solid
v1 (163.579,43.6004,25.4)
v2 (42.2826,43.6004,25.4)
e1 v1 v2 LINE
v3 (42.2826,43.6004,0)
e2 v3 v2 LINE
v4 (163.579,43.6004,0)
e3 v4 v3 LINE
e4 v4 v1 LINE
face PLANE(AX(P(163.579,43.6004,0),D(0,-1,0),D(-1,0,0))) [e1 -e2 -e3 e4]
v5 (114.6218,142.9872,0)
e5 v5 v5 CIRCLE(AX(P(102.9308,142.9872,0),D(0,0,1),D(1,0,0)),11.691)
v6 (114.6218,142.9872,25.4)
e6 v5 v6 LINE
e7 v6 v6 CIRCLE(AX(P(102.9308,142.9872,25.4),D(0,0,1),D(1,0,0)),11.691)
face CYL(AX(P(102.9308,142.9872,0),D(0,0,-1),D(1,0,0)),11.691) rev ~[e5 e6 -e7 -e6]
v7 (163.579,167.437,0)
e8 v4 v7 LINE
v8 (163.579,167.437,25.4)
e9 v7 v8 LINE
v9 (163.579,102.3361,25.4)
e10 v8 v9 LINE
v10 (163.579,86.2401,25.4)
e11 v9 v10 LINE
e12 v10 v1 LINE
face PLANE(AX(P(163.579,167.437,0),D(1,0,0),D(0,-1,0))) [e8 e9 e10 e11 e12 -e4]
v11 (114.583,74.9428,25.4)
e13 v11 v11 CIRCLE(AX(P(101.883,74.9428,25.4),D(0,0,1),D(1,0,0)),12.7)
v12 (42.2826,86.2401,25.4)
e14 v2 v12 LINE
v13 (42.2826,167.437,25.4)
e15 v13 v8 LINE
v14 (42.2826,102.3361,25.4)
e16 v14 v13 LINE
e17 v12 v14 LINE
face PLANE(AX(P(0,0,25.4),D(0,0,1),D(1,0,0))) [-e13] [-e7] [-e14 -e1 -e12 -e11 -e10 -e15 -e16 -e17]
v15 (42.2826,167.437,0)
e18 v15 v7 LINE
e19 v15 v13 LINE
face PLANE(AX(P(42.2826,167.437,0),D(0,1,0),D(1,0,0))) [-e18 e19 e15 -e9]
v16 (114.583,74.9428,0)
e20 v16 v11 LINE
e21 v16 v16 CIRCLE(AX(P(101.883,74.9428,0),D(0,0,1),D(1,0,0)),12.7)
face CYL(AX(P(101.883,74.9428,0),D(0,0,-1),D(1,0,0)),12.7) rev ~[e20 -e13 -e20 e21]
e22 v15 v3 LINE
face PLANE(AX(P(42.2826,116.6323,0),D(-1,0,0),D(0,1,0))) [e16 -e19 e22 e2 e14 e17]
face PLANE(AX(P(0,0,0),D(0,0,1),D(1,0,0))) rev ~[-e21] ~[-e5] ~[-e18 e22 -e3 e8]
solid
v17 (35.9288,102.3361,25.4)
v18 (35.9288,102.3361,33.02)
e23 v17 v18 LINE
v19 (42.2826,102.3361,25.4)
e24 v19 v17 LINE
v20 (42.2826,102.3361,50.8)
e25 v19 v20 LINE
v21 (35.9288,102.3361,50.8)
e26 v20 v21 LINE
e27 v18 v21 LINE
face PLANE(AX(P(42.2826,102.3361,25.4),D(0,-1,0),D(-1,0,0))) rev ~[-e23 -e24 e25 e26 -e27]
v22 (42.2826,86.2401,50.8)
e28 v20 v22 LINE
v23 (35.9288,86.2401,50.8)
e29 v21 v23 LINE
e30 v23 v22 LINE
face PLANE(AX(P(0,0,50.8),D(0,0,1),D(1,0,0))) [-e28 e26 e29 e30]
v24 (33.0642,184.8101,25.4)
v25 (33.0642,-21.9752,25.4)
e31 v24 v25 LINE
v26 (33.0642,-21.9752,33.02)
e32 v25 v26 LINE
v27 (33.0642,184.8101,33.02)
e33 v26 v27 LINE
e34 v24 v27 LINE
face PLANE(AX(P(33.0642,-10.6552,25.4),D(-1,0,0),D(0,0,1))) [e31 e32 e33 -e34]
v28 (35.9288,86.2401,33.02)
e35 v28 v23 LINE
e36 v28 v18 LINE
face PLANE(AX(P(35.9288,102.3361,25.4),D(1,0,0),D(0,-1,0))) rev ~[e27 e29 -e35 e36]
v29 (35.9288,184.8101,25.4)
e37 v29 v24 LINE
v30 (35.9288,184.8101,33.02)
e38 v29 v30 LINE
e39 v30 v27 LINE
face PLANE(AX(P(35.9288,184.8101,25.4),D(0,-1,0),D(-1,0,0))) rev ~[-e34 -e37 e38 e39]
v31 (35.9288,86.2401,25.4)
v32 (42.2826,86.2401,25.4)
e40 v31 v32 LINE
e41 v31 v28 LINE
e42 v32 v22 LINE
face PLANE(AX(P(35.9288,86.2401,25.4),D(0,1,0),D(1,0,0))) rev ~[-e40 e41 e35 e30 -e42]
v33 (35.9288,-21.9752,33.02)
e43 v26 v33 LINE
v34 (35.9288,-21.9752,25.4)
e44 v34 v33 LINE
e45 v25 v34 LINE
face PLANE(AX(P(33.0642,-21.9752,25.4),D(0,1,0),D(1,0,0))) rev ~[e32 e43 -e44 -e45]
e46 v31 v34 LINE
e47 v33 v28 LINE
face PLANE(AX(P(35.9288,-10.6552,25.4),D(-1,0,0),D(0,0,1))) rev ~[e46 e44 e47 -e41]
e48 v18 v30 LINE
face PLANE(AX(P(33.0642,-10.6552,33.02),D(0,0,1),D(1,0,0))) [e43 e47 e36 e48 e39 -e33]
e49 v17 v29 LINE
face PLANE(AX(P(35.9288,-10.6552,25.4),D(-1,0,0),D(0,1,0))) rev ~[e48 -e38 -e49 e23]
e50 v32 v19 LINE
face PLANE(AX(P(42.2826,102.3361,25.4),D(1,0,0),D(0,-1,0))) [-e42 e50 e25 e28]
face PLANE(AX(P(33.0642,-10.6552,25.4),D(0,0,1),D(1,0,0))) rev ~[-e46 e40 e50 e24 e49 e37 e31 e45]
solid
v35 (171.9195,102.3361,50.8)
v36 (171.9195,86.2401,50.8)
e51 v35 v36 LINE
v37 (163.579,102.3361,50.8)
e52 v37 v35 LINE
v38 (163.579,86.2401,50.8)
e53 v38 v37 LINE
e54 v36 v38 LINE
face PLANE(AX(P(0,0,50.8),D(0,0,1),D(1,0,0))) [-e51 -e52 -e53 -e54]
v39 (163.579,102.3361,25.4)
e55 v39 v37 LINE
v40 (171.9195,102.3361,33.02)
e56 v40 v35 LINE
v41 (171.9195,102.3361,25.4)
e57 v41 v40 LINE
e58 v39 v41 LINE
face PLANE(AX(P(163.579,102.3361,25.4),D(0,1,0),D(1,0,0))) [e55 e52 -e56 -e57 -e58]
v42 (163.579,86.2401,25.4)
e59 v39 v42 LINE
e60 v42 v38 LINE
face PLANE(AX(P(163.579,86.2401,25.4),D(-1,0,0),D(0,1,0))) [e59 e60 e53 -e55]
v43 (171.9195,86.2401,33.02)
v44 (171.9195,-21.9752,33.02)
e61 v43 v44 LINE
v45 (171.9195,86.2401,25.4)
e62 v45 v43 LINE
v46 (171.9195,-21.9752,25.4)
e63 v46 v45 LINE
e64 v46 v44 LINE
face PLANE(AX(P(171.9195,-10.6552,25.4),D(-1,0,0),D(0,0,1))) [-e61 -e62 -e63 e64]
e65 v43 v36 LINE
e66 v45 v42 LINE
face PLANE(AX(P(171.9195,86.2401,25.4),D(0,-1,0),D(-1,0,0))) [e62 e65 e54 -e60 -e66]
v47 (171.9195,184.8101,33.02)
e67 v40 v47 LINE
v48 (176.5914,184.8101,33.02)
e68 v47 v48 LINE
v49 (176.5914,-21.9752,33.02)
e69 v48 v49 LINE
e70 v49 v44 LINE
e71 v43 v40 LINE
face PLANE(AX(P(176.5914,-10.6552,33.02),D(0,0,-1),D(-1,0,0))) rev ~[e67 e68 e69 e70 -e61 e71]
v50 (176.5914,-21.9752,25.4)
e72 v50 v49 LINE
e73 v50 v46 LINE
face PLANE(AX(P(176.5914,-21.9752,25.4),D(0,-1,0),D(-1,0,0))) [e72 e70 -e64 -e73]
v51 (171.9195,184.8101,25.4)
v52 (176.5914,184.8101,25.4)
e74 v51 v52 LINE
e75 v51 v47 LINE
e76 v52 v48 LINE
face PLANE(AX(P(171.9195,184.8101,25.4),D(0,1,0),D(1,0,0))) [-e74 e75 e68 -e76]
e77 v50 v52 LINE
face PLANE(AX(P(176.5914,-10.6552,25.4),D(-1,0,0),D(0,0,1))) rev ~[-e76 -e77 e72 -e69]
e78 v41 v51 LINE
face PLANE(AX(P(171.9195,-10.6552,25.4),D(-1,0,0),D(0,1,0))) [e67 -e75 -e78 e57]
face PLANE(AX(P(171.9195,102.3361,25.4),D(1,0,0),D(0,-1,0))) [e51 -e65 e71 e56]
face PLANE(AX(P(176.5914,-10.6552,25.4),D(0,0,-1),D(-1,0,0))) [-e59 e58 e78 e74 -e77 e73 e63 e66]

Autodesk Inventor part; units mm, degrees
ref_plane "YZ Plane" through (0, 0, 0) normal (1, 0, 0) x (0, 1, 0)
ref_plane "XZ Plane" through (0, 0, 0) normal (0, 1, 0) x (-1, 0, 0)
ref_plane "XY Plane" through (0, 0, 0) normal (0, 0, 1) x (1, 0, 0)
sketch "Sketch1" plane through (0, 0, 0) normal (0, 0, 1) x (1, 0, 0)
  circle A0 centre (101.883, 74.9428) radius 12.7
  line L0 (42.2826, 167.437) -> (163.579, 167.437)
  line L1 (163.579, 167.437) -> (163.579, 43.6004)
  line L2 (163.579, 43.6004) -> (42.2826, 43.6004)
  line L3 (42.2826, 43.6004) -> (42.2826, 167.437)
  circle A1 centre (102.9308, 142.9872) radius 11.691
  line L4 (42.2826, 116.6323) -> (31.1691, 116.6323)
  line L5 (31.1691, 116.6323) -> (31.1691, 96.9454)
  line L6 (31.1691, 96.9454) -> (42.2826, 96.9454)
  line L7 (42.2826, 96.9454) -> (42.2826, 116.6323)
  line L8 (163.579, 116.6323) -> (174.375, 116.6323)
  line L9 (174.375, 116.6323) -> (174.375, 96.9454)
  line L10 (174.375, 96.9454) -> (163.579, 96.9454)
  line L11 (163.579, 96.9454) -> (163.579, 116.6323)
  line L12 (31.1691, 126.4757) -> (23.2309, 126.4757)
  line L13 (23.2309, 126.4757) -> (23.2309, 0)
  line L14 (23.2309, 0) -> (31.1691, 0)
  line L15 (31.1691, 0) -> (31.1691, 126.4757)
  line L16 (174.375, 126.4757) -> (184.536, 126.4757)
  line L17 (184.536, 126.4757) -> (184.536, 0)
  line L18 (184.536, 0) -> (174.375, 0)
  line L19 (174.375, 0) -> (174.375, 126.4757)
  point P0 (0, 0)
  dimension "d0" = 25.4
extrude "Extrusion1" add sketch "Sketch1" along normal blind 25.4 contours L0 L1 L2 L3
sketch "Sketch2" plane through (0, 0, 25.4) normal (0, 0, 1) x (1, 0, 0)
  line L0 (42.2826, 167.437) -> (42.2826, 43.6004) projected
  line L1 (42.2826, 102.3361) -> (35.9288, 102.3361)
  line L2 (35.9288, 102.3361) -> (35.9288, 86.2401)
  line L3 (35.9288, 86.2401) -> (42.2826, 86.2401)
  line L4 (42.2826, 86.2401) -> (42.2826, 102.3361)
  line L5 (163.579, 43.6004) -> (163.579, 167.437) projected
  line L6 (163.579, 102.3361) -> (171.9195, 102.3361)
  line L7 (171.9195, 102.3361) -> (171.9195, 86.2401)
  line L8 (171.9195, 86.2401) -> (163.579, 86.2401)
  line L9 (163.579, 86.2401) -> (163.579, 102.3361)
  point P0 (0, 0)
extrude "Extrusion2" add sketch "Sketch2" along normal blind 25.4
sketch "Sketch3" plane through (0, 0, 25.4) normal (0, 0, 1) x (1, 0, 0)
  circle A0 centre (101.883, 74.9428) radius 12.7 projected
  line L0 (35.9288, 184.8101) -> (33.0642, 184.8101)
  line L1 (33.0642, 184.8101) -> (33.0642, -10.6552)
  line L2 (33.0642, -10.6552) -> (35.9288, -10.6552)
  line L3 (35.9288, -10.6552) -> (35.9288, 184.8101)
  line L4 (171.9195, 184.8101) -> (176.5914, 184.8101)
  line L5 (176.5914, 184.8101) -> (176.5914, -10.6552)
  line L6 (176.5914, -10.6552) -> (171.9195, -10.6552)
  line L7 (171.9195, -10.6552) -> (171.9195, 184.8101)
  point P0 (0, 0)
extrude "Extrusion3" add sketch "Sketch3" along normal blind 7.62 contours L3 L2 L1 L0 | L4 L5 L6 L7
move faces "Move Face1" translate (0, -11.32, 0) faces at (175.0341, -10.6552, 27.94) (34.0191, -10.6552, 27.94)
properties part number "filter wheel"
